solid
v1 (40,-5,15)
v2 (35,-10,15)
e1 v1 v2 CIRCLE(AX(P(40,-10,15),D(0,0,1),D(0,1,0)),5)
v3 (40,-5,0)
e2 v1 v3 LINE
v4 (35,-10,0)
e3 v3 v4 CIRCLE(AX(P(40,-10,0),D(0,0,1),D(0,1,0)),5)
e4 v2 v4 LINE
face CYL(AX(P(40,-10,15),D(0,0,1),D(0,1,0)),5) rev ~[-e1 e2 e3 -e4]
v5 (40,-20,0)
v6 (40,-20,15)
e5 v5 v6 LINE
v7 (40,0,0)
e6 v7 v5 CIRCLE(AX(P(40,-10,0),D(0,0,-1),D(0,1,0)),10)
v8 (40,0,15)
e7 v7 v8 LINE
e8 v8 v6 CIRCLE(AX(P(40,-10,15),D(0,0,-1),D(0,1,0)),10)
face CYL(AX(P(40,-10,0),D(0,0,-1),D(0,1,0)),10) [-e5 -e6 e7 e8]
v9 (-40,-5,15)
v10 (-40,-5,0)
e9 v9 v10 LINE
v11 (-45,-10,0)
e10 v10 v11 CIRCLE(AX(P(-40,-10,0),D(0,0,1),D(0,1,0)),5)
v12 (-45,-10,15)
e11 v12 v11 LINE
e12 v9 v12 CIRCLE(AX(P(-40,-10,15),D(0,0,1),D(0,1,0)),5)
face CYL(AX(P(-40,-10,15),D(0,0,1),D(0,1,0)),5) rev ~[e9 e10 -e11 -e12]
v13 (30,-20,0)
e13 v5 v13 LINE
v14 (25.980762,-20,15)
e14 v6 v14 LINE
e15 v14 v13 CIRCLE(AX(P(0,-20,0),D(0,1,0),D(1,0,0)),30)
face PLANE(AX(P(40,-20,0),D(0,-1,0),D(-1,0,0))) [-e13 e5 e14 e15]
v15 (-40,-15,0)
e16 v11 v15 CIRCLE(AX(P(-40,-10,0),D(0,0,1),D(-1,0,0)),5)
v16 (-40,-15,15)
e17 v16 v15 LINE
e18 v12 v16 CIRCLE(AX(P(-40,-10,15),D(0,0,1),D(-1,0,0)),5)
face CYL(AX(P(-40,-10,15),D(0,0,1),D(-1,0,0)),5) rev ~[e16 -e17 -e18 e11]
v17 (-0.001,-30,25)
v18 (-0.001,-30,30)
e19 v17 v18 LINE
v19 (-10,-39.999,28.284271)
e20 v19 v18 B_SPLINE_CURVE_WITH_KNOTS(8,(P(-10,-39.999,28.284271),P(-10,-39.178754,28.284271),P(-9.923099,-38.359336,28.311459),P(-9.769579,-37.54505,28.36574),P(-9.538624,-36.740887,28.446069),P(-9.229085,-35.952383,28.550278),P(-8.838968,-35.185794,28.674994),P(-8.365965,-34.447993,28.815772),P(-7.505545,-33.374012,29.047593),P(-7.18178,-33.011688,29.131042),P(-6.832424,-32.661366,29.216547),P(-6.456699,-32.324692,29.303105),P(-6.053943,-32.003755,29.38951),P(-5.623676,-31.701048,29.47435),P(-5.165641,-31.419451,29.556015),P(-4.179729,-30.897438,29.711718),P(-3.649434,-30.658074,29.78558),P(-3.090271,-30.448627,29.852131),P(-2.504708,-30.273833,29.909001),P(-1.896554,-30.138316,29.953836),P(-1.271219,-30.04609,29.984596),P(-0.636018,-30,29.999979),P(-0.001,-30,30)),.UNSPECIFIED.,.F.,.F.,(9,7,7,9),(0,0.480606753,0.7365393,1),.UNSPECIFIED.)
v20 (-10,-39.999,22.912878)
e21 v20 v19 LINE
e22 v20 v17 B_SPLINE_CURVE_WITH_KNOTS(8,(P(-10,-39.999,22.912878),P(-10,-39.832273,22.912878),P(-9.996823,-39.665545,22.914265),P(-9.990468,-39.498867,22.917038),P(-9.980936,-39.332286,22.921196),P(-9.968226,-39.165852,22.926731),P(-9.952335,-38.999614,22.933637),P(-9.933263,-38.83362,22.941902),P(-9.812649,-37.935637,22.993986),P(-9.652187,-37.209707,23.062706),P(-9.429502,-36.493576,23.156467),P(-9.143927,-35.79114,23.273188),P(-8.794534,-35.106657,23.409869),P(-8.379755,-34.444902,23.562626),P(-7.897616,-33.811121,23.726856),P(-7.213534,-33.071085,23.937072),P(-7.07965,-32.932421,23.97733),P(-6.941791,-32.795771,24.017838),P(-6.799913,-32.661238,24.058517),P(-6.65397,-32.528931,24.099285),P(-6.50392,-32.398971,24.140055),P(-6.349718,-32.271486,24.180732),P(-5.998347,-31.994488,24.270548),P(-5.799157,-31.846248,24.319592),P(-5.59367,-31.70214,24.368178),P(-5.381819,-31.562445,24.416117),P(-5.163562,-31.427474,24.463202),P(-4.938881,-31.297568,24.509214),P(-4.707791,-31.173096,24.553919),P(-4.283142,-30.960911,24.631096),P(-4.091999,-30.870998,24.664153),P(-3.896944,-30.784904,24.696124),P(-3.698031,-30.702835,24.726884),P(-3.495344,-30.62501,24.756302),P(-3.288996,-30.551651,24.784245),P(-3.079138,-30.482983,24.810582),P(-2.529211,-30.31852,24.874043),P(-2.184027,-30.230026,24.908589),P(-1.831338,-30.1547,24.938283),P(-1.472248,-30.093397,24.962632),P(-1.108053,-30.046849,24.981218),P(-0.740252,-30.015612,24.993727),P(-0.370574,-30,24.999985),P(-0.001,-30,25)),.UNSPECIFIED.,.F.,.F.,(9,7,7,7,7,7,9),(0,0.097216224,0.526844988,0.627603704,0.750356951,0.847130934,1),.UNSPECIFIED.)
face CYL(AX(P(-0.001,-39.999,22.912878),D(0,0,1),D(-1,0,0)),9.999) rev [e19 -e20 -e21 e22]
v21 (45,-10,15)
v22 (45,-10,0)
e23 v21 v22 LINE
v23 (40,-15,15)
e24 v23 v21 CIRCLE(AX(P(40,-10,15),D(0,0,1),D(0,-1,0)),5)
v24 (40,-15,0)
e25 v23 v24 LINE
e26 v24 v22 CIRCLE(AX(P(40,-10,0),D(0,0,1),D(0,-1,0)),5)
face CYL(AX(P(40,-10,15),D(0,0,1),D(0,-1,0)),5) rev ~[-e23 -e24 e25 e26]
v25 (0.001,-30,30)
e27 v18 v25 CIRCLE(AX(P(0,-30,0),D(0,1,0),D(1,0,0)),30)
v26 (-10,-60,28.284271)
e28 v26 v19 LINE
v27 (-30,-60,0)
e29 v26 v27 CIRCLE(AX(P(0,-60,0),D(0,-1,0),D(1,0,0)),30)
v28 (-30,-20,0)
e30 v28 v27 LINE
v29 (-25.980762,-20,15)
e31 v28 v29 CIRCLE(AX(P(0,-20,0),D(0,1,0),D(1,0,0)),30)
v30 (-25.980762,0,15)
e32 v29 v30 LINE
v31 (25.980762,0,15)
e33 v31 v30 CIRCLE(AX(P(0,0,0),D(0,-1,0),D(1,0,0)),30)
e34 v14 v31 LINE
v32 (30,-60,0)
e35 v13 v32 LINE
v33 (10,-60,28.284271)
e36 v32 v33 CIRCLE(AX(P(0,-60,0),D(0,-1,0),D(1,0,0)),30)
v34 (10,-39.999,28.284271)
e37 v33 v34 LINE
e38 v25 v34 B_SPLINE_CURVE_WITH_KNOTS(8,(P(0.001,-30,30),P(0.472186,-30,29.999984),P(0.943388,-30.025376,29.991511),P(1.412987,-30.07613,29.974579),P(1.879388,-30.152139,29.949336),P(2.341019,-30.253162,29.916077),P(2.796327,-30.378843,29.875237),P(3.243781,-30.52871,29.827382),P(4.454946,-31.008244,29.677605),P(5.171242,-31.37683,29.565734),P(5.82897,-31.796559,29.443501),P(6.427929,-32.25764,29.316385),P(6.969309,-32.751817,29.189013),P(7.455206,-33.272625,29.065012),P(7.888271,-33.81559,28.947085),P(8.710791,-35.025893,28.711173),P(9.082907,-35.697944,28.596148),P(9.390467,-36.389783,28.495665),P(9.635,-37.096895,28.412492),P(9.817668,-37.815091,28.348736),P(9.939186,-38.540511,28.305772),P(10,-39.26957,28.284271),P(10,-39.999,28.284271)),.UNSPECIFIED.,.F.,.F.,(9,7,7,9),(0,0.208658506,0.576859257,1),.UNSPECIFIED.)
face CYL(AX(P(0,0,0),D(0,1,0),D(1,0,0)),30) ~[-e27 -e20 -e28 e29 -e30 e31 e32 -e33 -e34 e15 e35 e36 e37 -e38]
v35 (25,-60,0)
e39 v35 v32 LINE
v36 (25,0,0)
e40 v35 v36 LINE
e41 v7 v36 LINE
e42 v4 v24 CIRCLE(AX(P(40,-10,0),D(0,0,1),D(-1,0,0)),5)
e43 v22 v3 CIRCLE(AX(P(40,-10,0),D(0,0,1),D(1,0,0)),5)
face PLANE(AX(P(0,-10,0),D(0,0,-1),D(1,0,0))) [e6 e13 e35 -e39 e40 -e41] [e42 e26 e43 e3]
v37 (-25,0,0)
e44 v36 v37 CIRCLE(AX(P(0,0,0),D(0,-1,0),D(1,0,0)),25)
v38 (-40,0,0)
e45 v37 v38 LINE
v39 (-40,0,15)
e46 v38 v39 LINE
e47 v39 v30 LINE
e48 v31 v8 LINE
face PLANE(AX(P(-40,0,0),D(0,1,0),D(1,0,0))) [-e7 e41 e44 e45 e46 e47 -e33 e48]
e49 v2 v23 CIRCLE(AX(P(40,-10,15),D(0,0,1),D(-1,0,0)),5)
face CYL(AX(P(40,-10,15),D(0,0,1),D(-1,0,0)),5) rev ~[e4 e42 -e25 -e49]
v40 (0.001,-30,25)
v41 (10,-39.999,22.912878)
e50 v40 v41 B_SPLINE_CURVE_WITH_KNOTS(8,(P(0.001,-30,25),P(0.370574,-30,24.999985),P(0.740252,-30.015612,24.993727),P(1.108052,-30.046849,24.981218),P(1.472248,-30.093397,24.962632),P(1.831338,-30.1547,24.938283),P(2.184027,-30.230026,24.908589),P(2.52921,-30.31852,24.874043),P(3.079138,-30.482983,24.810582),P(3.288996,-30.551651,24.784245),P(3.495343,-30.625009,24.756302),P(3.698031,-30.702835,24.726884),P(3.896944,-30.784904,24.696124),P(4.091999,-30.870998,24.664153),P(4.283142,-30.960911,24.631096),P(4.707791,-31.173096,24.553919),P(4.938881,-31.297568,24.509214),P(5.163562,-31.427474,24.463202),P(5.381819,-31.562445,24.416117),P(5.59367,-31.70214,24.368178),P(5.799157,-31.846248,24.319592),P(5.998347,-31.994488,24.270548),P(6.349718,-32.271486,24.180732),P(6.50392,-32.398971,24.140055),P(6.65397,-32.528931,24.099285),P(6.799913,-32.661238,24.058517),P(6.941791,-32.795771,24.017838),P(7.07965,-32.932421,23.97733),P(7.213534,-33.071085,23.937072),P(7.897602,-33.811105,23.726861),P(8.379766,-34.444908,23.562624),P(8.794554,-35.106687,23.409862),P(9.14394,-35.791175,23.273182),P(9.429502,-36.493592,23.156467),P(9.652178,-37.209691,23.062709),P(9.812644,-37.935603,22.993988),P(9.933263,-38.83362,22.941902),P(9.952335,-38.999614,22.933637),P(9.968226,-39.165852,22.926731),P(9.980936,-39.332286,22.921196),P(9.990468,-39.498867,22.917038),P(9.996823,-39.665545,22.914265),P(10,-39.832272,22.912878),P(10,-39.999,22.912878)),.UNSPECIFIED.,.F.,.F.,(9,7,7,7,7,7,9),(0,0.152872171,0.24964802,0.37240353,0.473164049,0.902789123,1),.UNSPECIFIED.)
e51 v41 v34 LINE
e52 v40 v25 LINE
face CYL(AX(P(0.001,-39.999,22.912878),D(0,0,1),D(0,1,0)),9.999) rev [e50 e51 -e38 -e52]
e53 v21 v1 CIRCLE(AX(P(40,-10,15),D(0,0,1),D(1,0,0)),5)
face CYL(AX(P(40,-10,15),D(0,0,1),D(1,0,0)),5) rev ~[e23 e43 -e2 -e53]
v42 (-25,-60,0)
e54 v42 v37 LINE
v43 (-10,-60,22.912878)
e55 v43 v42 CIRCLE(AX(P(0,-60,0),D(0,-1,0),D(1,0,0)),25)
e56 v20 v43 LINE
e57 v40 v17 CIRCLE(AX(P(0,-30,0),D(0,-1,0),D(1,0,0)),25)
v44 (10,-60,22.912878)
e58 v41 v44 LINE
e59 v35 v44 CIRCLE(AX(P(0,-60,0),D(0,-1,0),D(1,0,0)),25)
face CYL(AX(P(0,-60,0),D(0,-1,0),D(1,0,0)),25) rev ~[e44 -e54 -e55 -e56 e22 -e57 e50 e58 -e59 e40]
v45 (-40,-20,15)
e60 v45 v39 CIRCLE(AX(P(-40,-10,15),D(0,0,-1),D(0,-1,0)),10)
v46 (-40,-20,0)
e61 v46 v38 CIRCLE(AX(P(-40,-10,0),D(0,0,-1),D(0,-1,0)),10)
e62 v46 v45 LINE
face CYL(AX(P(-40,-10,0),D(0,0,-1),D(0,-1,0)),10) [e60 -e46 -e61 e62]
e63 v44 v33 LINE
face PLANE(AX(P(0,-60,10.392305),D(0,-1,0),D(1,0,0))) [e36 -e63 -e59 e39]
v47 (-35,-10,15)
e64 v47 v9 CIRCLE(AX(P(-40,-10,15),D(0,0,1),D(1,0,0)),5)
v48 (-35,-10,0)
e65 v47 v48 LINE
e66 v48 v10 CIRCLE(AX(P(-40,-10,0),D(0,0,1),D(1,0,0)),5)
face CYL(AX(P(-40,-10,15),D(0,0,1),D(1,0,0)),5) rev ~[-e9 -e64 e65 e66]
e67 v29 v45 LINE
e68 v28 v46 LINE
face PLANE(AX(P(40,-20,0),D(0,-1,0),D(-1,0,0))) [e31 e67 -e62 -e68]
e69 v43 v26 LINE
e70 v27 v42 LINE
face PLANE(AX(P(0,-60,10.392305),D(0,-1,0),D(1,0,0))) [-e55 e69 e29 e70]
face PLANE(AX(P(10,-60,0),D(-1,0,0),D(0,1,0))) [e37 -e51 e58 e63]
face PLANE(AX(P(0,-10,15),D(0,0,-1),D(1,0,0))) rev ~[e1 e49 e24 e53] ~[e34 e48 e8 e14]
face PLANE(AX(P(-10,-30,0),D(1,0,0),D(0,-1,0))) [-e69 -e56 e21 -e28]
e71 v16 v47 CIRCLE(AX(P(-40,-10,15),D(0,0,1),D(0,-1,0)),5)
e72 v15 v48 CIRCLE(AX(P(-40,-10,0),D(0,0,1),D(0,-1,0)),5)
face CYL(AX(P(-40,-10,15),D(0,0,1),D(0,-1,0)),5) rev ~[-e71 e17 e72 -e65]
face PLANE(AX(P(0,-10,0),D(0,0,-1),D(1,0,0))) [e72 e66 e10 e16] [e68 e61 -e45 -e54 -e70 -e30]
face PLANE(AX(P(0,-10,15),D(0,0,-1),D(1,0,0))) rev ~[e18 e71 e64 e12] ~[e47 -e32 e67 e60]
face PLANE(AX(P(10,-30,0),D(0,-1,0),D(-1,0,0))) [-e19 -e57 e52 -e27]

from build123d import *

# Parameters (mm, degrees)
F1_DEPTH  = 60
F3_DEPTH  = 15
F5_DEPTH  = 15.001
F7_DEPTH  = 15.001
F9_DEPTH  = 60.001
F11_REACH = 66.0565127546
F12_R     = 9.999


# Not quite as in the source:
# - a fillet or chamfer is up to 0.001 mm smaller than in the source, because OpenCascade refuses the exact size


with BuildPart() as f1:
    # F0 (on Front) → F1 (new body)
    with BuildSketch(Plane.XZ):
        with BuildLine():
            Line((-30, 0), (30, 0))
            ThreePointArc((30, 0), (0, 30), (-30, 0))
        make_face()
    extrude(amount=F1_DEPTH)

    # F2 (on face) → F3 (join)
    with BuildSketch(Plane(origin=(0, 0, 0), x_dir=(1, 0, 0), z_dir=(0, 0, -1))):
        with BuildLine():
            ThreePointArc((-40, 20), (-50, 10), (-40, 0))
            Line((-40, 0), (40, 0))
            ThreePointArc((40, 0), (50, 10), (40, 20))
            Line((40, 20), (-40, 20))
        make_face()
    extrude(amount=-F3_DEPTH)

    # F4 (on face) → F5 (cut, through all)
    with BuildSketch(Plane.XY.offset(15)):
        with BuildLine():
            Line((-45, -10), (-40, -10))
            Line((-40, -10), (-40, -5))
            ThreePointArc((-40, -5), (-43.5355339059, -6.4644660941), (-45, -10))
        make_face()
        with BuildLine():
            Line((-40, -5), (-40, -10))
            Line((-40, -10), (-35, -10))
            ThreePointArc((-35, -10), (-36.4644660941, -6.4644660941), (-40, -5))
        make_face()
        with BuildLine():
            Line((-40, -10), (-40, -15))
            ThreePointArc((-40, -15), (-36.4644660941, -13.5355339059), (-35, -10))
            Line((-35, -10), (-40, -10))
        make_face()
        with BuildLine():
            ThreePointArc((-45, -10), (-43.5355339059, -13.5355339059), (-40, -15))
            Line((-40, -15), (-40, -10))
            Line((-40, -10), (-45, -10))
        make_face()
    extrude(amount=-F5_DEPTH, mode=Mode.SUBTRACT)

    # F6 (on face) → F7 (cut, through all)
    with BuildSketch(Plane.XY.offset(15)):
        with BuildLine():
            ThreePointArc((40, -5), (36.4644660941, -6.4644660941), (35, -10))
            Line((35, -10), (40, -10))
            Line((40, -10), (40, -5))
        make_face()
        with BuildLine():
            Line((40, -5), (40, -10))
            Line((40, -10), (45, -10))
            ThreePointArc((45, -10), (43.5355339059, -6.4644660941), (40, -5))
        make_face()
        with BuildLine():
            Line((45, -10), (40, -10))
            Line((40, -10), (40, -15))
            ThreePointArc((40, -15), (43.5355339059, -13.5355339059), (45, -10))
        make_face()
        with BuildLine():
            Line((40, -10), (35, -10))
            ThreePointArc((35, -10), (36.4644660941, -13.5355339059), (40, -15))
            Line((40, -15), (40, -10))
        make_face()
    extrude(amount=-F7_DEPTH, mode=Mode.SUBTRACT)

    # F8 (on face) → F9 (cut, through all)
    with BuildSketch(Plane.XZ.offset(60)):
        with BuildLine():
            Line((-25, 0), (25, 0))
            ThreePointArc((25, 0), (0, 25), (-25, 0))
        make_face()
    extrude(amount=-F9_DEPTH, mode=Mode.SUBTRACT)

    f11_end = f1.faces().sort_by_distance((0, -30, 30))[0]
    # F10 (on Top) → F11 (cut, up to a face of the model that its end follows)
    with BuildSketch(Plane.XY):
        Polygon((-10, -60), (0, -60), (10, -60), (10, -30), (-10, -30), align=None)
    f11_long = extrude(amount=F11_REACH, mode=Mode.PRIVATE)
    add(split(f11_long, bisect_by=f11_end, keep=Keep.BOTTOM, mode=Mode.PRIVATE), mode=Mode.SUBTRACT)

    # F12 (radius 10 in the source; OpenCascade refuses exactly that, so slightly less here)
    f12_edges = [f1.edges().sort_by_distance(p)[0] for p in [
        (-10, -30, 25.598575),
        (10, -30, 25.598575),
    ]]
    fillet(f12_edges, radius=F12_R)


solid = f1.part
